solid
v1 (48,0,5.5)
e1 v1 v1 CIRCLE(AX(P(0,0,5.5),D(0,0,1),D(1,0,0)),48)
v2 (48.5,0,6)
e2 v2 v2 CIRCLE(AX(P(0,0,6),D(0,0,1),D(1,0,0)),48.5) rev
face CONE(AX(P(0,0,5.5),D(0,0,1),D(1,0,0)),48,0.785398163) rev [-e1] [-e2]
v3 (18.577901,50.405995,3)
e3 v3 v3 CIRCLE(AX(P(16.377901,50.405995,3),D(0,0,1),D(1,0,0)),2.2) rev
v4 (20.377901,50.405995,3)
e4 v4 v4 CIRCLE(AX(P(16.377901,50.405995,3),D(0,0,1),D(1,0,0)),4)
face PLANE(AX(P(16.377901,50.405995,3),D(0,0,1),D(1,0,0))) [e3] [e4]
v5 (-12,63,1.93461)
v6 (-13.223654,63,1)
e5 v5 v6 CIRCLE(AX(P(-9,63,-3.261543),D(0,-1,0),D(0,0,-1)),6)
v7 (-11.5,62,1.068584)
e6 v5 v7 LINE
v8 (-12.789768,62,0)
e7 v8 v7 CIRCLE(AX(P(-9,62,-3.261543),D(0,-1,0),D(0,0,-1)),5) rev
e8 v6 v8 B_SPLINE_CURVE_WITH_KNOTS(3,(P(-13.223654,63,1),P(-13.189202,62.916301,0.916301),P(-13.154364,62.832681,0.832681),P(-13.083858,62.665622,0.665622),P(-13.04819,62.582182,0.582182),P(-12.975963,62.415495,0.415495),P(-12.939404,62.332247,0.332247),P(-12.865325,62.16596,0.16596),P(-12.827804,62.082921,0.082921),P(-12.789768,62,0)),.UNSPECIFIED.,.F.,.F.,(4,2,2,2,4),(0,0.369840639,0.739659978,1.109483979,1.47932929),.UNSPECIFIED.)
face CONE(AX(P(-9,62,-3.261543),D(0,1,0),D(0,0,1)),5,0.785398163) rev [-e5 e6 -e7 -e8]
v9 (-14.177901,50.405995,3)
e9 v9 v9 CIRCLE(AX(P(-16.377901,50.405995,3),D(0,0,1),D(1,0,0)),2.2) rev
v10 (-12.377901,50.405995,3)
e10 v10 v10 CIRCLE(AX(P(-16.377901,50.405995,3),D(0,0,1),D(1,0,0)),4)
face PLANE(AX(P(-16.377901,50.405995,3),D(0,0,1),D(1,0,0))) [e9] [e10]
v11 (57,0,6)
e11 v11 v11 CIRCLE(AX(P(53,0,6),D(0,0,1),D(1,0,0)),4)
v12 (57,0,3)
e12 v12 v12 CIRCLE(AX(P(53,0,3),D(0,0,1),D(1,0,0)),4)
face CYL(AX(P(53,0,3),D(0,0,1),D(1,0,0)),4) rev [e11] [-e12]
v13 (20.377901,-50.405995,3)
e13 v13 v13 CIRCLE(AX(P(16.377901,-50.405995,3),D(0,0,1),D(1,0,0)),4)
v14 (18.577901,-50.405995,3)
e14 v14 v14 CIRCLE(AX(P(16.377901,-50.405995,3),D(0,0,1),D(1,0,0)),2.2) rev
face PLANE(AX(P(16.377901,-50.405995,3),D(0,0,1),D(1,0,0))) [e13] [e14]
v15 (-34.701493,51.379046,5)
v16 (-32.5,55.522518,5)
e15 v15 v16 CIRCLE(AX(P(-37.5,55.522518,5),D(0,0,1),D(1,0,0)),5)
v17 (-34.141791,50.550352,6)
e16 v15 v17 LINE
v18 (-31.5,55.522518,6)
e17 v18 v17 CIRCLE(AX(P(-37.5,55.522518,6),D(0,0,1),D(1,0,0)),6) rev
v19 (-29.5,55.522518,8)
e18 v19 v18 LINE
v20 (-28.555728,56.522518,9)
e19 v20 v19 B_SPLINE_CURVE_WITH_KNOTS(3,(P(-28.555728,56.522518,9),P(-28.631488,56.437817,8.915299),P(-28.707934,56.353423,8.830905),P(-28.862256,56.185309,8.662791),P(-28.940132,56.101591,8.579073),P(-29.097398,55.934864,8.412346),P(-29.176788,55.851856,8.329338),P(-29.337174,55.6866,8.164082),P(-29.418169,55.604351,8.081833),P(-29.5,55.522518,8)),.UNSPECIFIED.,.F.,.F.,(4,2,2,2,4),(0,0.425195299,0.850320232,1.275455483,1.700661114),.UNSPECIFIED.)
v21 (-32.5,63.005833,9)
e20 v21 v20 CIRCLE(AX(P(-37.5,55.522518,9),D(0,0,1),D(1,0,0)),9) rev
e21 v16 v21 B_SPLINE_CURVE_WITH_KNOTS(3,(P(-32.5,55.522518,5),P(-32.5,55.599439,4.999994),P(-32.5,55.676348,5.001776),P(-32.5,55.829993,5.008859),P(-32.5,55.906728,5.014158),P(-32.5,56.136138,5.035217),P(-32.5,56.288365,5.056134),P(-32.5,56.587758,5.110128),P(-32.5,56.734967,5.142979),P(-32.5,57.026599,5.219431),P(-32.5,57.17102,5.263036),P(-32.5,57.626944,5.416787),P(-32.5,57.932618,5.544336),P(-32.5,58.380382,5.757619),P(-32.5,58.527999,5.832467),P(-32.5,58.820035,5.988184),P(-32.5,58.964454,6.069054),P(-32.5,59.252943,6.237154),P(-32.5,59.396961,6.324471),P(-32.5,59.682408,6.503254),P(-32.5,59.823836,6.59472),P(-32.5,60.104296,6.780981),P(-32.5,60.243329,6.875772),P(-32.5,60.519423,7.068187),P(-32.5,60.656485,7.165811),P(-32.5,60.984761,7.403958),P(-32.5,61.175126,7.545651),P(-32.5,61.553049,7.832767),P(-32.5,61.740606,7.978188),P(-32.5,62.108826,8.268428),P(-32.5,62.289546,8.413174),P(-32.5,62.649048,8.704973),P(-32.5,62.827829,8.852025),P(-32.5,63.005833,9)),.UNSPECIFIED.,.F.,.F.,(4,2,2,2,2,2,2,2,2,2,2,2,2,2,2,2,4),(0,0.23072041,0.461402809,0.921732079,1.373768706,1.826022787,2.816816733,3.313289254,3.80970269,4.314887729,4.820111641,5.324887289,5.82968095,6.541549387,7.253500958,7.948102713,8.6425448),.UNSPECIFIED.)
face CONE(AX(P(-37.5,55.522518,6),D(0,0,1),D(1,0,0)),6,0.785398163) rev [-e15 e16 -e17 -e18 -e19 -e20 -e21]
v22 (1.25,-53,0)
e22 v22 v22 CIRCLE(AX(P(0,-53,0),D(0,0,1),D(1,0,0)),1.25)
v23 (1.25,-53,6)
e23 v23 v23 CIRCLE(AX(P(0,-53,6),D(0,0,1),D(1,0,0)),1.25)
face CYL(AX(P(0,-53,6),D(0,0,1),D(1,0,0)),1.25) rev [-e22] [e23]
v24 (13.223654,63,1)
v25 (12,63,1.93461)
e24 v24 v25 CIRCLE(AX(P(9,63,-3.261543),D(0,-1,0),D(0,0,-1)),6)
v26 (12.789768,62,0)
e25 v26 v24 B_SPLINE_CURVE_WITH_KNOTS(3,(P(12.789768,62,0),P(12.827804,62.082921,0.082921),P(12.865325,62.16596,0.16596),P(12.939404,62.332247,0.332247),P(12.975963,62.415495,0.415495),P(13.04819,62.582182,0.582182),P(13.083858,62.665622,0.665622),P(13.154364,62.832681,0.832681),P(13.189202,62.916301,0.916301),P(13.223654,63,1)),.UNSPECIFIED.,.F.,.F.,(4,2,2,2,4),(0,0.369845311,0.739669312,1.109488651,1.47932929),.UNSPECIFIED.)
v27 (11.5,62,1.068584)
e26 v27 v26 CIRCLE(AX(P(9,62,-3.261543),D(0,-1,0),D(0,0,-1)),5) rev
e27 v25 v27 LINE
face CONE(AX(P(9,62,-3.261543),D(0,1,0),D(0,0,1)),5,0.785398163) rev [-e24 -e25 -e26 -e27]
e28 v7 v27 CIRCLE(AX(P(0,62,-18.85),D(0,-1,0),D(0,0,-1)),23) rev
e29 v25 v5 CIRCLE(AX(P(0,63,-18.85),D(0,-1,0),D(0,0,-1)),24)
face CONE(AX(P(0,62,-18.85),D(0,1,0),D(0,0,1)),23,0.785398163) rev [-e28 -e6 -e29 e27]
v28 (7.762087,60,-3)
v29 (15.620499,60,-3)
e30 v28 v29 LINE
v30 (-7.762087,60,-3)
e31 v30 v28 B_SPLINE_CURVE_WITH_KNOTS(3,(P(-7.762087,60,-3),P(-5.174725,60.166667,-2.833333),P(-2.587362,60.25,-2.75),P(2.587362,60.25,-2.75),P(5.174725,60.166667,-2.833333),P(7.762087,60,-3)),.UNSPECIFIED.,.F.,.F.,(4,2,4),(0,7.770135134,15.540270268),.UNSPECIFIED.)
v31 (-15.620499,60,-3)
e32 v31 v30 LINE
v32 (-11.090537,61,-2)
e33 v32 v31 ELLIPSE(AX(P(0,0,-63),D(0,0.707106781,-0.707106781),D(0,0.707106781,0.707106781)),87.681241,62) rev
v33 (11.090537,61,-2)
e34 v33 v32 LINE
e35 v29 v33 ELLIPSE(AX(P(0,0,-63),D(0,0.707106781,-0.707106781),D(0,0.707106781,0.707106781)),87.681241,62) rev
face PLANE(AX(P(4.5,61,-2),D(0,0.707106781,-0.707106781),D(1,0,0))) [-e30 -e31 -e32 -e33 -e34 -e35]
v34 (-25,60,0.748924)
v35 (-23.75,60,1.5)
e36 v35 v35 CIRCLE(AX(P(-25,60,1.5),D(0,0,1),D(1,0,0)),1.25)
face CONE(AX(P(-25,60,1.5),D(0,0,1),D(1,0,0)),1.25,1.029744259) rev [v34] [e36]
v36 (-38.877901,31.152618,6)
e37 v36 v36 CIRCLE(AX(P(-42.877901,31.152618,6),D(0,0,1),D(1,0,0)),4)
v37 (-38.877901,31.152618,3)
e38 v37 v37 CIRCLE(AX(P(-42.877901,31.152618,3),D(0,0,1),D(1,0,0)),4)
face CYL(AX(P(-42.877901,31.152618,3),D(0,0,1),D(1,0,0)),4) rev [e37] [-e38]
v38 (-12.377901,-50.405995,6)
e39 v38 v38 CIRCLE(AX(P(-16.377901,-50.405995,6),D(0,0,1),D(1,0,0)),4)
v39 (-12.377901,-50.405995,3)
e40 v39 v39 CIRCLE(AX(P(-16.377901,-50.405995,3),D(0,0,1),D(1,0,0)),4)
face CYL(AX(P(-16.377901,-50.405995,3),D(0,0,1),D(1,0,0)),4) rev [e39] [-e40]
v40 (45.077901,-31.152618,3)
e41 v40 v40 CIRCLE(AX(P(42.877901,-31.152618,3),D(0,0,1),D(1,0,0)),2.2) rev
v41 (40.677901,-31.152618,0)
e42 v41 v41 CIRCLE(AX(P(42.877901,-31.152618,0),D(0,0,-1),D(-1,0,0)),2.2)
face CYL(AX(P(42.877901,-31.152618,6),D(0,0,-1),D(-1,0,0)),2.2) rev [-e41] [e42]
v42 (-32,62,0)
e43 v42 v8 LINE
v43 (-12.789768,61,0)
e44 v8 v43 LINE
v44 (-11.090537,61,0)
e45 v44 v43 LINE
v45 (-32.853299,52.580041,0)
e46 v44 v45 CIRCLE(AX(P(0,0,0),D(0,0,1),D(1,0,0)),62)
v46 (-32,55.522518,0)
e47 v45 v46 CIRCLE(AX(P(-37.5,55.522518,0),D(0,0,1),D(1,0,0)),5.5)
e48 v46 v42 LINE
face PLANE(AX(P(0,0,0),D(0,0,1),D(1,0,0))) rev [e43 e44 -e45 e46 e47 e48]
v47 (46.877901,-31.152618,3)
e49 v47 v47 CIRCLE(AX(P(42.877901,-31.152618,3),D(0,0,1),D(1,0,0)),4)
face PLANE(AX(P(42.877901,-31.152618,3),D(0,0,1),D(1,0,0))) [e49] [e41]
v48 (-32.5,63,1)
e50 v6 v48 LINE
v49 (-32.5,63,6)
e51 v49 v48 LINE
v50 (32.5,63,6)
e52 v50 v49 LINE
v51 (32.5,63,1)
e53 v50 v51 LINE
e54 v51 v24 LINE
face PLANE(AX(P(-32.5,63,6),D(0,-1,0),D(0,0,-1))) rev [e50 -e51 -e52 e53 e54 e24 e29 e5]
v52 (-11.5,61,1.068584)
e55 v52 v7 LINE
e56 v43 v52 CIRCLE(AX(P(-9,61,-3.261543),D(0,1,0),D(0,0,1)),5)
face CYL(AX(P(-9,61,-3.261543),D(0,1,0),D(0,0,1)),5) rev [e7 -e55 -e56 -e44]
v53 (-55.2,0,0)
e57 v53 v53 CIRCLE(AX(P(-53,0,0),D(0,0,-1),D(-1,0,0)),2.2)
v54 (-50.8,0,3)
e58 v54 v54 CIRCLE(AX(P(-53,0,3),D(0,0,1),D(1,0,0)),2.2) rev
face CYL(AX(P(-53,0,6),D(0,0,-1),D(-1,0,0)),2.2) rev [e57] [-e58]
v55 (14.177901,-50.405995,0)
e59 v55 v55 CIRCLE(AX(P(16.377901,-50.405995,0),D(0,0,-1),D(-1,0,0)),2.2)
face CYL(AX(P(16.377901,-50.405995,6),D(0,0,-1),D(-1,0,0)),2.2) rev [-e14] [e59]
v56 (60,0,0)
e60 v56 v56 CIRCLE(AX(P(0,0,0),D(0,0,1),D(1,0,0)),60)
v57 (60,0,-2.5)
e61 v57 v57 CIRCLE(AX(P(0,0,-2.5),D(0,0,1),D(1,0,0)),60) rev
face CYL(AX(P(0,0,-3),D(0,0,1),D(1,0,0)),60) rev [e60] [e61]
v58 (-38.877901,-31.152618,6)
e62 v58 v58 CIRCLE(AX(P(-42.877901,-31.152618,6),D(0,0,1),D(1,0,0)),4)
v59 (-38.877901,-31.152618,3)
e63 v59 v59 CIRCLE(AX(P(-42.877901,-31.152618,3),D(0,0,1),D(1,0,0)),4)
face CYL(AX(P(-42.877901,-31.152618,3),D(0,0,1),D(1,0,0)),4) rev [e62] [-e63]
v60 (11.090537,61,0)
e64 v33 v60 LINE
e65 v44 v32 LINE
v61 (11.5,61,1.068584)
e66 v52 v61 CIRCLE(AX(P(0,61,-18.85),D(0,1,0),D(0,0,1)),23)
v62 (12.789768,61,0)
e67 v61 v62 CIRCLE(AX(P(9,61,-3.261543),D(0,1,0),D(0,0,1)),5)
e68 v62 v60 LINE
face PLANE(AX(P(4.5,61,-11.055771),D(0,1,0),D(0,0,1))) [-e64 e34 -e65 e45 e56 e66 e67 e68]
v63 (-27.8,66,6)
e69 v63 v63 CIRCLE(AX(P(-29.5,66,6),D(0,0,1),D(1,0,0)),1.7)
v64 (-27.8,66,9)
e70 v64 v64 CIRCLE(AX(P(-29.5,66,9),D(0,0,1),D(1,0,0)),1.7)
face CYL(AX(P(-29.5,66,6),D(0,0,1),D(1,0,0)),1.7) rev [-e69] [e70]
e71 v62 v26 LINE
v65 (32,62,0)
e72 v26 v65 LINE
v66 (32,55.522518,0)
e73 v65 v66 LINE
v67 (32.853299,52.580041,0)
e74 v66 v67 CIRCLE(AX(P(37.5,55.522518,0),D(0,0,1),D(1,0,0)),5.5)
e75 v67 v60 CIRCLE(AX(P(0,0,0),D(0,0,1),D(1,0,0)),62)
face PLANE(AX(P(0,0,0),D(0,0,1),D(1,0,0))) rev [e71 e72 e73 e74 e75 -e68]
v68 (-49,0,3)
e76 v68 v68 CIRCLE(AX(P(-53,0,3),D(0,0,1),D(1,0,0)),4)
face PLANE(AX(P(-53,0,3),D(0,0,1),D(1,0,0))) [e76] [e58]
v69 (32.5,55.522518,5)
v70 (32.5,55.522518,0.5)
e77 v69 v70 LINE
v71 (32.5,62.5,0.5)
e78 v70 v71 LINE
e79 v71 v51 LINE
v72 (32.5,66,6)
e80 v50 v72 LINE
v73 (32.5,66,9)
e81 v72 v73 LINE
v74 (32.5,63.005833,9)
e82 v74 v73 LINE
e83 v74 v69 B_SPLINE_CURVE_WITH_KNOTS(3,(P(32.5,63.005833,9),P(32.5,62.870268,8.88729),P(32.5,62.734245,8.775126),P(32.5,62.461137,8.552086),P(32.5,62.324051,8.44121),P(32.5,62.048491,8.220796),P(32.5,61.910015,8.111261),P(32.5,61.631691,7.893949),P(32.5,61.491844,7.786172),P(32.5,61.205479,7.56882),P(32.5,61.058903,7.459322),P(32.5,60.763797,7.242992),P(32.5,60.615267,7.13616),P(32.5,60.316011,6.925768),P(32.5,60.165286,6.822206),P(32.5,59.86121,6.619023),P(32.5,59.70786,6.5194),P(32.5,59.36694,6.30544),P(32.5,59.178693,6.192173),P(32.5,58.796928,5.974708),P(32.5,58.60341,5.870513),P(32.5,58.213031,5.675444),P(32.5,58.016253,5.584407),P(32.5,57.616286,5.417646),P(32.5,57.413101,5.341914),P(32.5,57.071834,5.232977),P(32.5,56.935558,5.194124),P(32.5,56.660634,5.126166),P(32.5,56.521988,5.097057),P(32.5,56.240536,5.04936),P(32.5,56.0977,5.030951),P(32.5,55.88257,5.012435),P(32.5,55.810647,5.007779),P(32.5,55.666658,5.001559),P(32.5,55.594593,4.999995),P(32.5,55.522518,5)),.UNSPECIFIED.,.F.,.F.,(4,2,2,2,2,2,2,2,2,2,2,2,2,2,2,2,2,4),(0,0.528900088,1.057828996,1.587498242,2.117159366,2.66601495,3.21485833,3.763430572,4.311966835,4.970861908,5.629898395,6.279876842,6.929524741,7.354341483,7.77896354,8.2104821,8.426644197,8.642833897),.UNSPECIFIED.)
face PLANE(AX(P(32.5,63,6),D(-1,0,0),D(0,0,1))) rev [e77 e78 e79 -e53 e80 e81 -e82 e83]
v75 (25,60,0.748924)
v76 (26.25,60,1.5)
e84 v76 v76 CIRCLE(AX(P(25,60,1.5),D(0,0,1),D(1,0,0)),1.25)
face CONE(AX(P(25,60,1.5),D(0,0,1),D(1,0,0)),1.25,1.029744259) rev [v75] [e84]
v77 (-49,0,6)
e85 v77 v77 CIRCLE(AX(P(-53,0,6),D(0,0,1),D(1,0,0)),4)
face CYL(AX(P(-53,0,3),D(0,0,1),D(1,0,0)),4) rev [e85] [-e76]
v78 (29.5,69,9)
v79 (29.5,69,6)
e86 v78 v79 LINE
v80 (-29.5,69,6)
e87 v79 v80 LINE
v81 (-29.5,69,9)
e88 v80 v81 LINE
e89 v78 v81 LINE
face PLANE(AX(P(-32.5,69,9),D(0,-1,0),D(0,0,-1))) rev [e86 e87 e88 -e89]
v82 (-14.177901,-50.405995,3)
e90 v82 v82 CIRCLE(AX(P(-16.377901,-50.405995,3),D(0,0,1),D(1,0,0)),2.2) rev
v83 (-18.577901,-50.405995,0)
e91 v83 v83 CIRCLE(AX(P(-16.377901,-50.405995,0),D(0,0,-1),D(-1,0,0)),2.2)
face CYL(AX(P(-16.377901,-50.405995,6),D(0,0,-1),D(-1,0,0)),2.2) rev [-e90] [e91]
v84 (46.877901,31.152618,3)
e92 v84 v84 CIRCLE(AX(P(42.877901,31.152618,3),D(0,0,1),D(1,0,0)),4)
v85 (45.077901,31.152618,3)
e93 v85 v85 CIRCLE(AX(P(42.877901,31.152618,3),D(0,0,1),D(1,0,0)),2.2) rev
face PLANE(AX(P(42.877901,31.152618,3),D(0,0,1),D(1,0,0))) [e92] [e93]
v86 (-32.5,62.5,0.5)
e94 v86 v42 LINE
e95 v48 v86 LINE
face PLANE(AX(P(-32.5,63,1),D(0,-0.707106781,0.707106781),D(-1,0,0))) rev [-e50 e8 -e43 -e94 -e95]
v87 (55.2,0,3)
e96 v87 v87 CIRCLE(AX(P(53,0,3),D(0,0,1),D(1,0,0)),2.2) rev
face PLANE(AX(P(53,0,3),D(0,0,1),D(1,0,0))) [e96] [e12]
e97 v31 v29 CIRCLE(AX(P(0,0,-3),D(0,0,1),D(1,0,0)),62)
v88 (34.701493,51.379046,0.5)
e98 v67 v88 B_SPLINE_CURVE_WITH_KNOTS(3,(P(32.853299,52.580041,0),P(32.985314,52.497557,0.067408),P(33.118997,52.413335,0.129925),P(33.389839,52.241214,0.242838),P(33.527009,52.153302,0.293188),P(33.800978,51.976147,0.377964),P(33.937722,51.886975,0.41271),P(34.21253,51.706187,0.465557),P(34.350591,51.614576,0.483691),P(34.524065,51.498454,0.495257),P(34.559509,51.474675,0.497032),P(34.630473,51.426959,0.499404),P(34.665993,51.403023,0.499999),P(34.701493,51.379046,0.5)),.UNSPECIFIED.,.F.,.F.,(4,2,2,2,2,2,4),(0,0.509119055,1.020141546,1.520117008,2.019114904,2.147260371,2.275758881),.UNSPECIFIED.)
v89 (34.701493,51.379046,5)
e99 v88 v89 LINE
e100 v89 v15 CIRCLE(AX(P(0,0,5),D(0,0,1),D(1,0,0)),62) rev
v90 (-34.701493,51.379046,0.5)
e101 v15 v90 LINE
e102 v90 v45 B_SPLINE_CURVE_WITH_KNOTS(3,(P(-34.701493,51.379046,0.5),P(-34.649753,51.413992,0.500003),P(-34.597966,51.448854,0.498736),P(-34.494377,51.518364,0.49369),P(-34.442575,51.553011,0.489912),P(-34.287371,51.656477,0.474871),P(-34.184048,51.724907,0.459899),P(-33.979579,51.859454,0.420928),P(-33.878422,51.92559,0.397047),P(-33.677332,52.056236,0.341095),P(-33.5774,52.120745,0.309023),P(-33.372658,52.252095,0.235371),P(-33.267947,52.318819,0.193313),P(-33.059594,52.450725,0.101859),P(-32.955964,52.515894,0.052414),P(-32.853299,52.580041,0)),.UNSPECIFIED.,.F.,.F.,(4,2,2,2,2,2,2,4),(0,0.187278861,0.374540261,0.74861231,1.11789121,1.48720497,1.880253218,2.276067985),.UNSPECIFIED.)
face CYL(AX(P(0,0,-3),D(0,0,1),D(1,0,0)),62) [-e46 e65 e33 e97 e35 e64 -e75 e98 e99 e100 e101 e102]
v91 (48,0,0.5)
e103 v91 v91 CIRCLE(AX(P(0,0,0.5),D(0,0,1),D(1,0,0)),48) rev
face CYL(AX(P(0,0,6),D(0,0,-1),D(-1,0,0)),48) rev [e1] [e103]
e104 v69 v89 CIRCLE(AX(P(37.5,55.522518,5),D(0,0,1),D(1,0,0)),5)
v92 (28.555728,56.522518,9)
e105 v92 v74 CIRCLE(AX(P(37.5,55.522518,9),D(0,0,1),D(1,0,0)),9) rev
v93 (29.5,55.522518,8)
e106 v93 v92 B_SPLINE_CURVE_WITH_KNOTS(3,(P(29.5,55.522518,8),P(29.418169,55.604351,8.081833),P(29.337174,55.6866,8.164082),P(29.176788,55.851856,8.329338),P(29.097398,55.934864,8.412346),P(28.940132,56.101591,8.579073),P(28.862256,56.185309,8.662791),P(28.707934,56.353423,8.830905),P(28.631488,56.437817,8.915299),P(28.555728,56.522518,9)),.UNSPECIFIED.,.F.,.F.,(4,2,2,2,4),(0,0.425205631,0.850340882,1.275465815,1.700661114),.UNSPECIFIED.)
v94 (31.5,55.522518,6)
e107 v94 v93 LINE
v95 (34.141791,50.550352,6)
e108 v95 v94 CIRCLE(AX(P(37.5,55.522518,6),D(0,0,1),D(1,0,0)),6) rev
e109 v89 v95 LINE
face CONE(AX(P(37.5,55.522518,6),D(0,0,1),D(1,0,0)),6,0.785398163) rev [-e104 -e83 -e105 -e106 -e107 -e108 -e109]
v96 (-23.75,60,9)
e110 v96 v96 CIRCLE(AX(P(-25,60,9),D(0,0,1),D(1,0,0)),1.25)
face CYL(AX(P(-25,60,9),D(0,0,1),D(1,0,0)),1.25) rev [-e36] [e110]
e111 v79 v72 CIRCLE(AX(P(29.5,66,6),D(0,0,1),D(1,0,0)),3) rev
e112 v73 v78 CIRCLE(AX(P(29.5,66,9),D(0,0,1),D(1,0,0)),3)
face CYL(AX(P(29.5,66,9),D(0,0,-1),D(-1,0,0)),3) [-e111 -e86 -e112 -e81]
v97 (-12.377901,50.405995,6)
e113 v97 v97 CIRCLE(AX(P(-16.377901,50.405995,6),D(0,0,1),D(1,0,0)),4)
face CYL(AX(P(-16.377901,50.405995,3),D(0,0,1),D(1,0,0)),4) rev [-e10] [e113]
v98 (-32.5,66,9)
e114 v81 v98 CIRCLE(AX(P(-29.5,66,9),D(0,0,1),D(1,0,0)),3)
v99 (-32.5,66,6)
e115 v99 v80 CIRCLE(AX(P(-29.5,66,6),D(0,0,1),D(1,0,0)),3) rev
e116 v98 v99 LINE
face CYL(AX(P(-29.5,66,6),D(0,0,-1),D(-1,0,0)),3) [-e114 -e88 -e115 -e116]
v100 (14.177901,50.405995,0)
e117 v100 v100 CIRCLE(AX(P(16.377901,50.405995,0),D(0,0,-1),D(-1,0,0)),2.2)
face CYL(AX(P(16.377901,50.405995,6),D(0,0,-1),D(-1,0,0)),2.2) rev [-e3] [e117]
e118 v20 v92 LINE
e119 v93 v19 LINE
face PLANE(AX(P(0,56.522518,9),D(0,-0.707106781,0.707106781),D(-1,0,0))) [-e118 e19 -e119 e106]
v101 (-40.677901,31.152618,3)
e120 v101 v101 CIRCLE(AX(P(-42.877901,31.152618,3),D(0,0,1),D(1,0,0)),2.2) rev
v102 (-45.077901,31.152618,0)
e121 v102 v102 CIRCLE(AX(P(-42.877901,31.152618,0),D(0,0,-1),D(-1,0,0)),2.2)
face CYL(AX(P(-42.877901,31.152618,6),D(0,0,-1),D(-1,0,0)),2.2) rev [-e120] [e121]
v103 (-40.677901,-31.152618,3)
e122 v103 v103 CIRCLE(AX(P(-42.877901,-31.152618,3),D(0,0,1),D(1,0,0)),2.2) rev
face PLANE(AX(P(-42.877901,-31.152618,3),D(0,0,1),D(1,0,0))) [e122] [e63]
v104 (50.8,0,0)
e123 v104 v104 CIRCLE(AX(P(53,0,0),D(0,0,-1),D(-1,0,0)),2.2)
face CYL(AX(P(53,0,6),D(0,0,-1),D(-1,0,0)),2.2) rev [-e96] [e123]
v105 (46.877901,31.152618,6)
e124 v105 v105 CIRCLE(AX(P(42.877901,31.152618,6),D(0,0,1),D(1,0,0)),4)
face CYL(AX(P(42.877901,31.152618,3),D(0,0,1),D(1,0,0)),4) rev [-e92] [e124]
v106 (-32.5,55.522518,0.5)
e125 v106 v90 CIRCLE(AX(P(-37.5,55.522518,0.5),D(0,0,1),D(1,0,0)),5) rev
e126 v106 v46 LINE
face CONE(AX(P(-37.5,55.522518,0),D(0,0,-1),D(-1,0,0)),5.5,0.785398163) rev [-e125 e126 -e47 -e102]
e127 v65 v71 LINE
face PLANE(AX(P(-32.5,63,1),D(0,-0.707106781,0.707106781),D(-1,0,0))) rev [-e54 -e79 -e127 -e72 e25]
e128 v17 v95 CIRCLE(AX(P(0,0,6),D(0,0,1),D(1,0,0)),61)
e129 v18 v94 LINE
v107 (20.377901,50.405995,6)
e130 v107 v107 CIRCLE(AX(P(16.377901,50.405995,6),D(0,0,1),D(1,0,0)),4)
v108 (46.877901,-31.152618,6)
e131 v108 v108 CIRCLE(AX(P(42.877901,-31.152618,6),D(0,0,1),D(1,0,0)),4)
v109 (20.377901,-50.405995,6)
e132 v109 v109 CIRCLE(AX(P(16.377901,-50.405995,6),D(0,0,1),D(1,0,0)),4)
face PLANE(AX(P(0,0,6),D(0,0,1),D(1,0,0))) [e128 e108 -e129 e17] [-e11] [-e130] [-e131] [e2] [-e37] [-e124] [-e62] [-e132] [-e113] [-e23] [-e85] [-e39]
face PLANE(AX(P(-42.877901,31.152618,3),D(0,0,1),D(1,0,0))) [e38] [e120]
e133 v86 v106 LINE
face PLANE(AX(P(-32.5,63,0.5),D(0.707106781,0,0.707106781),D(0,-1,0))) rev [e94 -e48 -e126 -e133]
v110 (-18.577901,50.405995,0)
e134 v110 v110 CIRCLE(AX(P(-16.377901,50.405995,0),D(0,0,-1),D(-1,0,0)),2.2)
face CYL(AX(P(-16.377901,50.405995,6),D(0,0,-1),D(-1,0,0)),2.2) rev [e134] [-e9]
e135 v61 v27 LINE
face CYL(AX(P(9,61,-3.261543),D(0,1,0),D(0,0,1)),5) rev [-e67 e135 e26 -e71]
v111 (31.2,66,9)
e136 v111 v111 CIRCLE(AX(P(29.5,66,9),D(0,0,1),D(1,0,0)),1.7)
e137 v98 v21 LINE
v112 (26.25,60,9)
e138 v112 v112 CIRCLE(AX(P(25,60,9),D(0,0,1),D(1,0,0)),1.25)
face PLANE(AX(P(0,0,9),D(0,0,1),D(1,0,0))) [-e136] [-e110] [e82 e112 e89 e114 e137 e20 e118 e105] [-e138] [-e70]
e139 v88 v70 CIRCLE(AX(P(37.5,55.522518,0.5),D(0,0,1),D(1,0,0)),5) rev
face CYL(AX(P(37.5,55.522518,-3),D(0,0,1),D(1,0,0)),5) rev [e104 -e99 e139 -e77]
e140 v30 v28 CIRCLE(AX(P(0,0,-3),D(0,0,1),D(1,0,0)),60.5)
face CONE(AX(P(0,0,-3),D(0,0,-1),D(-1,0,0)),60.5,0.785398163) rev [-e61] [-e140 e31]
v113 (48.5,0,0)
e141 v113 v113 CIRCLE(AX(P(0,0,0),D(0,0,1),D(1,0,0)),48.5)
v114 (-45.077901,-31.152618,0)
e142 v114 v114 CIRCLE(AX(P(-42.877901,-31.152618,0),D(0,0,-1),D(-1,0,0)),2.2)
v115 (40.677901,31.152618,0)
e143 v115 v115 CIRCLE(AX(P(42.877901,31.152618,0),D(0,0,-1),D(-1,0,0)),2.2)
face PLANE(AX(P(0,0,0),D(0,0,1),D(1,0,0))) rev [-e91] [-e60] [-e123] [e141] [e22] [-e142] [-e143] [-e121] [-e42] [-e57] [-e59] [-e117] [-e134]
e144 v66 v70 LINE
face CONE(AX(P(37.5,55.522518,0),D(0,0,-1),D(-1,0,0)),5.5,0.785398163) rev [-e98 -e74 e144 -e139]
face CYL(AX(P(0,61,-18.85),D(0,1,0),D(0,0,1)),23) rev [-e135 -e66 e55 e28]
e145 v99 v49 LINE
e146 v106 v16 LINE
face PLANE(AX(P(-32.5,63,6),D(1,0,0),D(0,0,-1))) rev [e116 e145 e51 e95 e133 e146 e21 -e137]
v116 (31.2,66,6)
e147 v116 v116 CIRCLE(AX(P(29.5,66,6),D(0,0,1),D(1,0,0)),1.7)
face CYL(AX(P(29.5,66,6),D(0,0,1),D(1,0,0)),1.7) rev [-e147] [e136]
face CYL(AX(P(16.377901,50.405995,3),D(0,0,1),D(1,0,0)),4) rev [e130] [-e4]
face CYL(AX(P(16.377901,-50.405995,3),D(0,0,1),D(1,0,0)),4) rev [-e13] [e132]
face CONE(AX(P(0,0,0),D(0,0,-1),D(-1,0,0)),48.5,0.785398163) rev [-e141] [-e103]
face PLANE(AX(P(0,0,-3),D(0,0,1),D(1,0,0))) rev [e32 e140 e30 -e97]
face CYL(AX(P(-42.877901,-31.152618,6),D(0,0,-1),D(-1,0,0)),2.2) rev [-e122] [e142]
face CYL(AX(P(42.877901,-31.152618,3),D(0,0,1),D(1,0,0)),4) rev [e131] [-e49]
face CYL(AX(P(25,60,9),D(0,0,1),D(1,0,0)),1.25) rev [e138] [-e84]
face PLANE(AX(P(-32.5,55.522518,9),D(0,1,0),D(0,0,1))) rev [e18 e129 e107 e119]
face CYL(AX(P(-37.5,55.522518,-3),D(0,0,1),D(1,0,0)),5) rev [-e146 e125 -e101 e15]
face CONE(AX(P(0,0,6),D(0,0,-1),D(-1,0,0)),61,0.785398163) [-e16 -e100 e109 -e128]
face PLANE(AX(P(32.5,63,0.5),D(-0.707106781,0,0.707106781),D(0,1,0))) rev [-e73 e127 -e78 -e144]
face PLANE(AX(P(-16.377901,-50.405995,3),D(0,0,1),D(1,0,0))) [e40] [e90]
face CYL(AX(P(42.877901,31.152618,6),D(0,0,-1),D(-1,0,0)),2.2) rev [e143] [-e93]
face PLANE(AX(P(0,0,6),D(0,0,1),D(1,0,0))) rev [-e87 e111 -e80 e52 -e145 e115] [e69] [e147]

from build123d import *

# Parameters (mm, degrees)
SKETCH_1_R             = 62
SKETCH_1_R_2           = 60
EXTRUDE_1_DEPTH        = 3
EXTRUDE_START          = 6
SKETCH_2_R             = 48
EXTRUDE_2_DEPTH        = 6
FILLET_1_R             = 5
CHAMFER_1_SIZE         = 0.5
CHAMFER_2_SIZE         = 0.5
SKETCH_6_R             = 2.2
CUT_EXTRUDE_1_DEPTH    = 6
SKETCH_7_W             = 65
SKETCH_7_H             = 13.477482046
EXTRUDE_3_DEPTH        = 3
SKETCH_11_R            = 1.7
CUT_EXTRUDE_2_DEPTH    = 3
CHAMFER_3_SIZE         = 1
CHAMFER_4_SIZE         = 1
FILLET_2_R             = 3
CHAMFER_5_3_ANGLE      = 291.929687
SKETCH_12_R            = 4
CUT_EXTRUDE_3_DEPTH    = 3
CUT_EXTRUDE_4_DEPTH    = 2
CHAMFER_6_SIZE         = 1
HOLE_WIZARD_M3_1_D     = 2.5
HOLE_WIZARD_M3_1_DEPTH = 7.5
HOLE_WIZARD_M3_1_TIP   = 0.751075774
HOLE_WIZARD_M3_2_D     = 2.5
HOLE_WIZARD_M3_2_DEPTH = 7.5
HOLE_WIZARD_M3_2_TIP   = 0.751075774


with BuildPart() as part:
    # 草图1 → 凸台-拉伸1 (new body)
    with BuildSketch(Plane.XY):
        Circle(SKETCH_1_R)
        Circle(SKETCH_1_R_2, mode=Mode.SUBTRACT)
    extrude(amount=-EXTRUDE_1_DEPTH)

    # 草图2 → 凸台-拉伸2 (add)
    with BuildSketch(Plane.XY.offset(EXTRUDE_START)):
        with BuildLine():
            Line((-32.5, 63), (32.5, 63))
            Line((32.5, 63), (32.5, 52.79914772))
            ThreePointArc((32.5, 52.79914772), (0, -62), (-32.5, 52.79914772))
            Line((-32.5, 52.79914772), (-32.5, 63))
        make_face()
        Circle(SKETCH_2_R, mode=Mode.SUBTRACT)
    extrude(amount=-EXTRUDE_2_DEPTH)

    # 圆角1
    # the kernel refuses this fillet: 5 mm, written as the material it adds along each edge
    with BuildSketch(Plane(origin=(32.5, 52.79914772, 6), x_dir=(0.8403342947446245, -0.5420685132675156, 0), z_dir=(0, 0, -1))) as fillet_1_piece_1:
        with BuildLine():
            CenterArc((2.72541822, -4.998883971), FILLET_1_R, 91.210593649, 55.964843523)
            Line((-1.476253254, -2.288541405), (0, 0))
            ThreePointArc((0, 0), (1.309890927, -0.013838756), (2.619781855, 0))
        make_face()
    extrude(amount=6)
    with BuildSketch(Plane(origin=(-32.5, 52.79914772, 6), x_dir=(-0.840334294744627, -0.5420685132675117, 0), z_dir=(0, 0, -1))) as fillet_1_piece_2:
        with BuildLine():
            CenterArc((2.72541822, 4.998883971), FILLET_1_R, 212.824562828, 55.964843523)
            Line((-1.476253254, 2.288541405), (0, 0))
            ThreePointArc((0, 0), (1.309890927, 0.013838756), (2.619781855, 0))
        make_face()
    extrude(amount=6)

    # 倒角1
    chamfer_1_edges = [part.edges().sort_by_distance(p)[0] for p in [
        (-48, 0, 0),
        (-48, 0, 6),
        (-60, 0, -3),
    ]]
    chamfer(chamfer_1_edges, length=CHAMFER_1_SIZE)

    # 倒角2
    # the kernel refuses this chamfer: 0.5 mm, written as the material it takes off along each edge
    with BuildSketch(Plane(origin=(-32.5, 55.522517954, 0), x_dir=(0, 0, 1), z_dir=(0, 1, 0)), Plane(origin=(32.5, 64.285841494, 0), x_dir=(0, 0, 1), z_dir=(0, -1, 0))) as chamfer_2_piece_1:
        Polygon((CHAMFER_2_SIZE, 0), (0, CHAMFER_2_SIZE), (0, 0), align=None)
    extrude(amount=8.76332354, mode=Mode.SUBTRACT)
    with BuildSketch(Plane(origin=(37.5, 55.522517954, 0), x_dir=(-0.15613015555825177, -0.9877364904291813, 0), z_dir=(0.9877364904291813, -0.15613015555825177, 0))) as chamfer_2_piece_2_section:
        Polygon((5, -CHAMFER_2_SIZE), (5 + CHAMFER_2_SIZE, 0), (5, 0), align=None)
    chamfer_2_piece_2 = revolve(axis=Axis((37.5, 55.522517954, 0), (0, 0, -1)), revolution_arc=81.017652556, mode=Mode.PRIVATE)
    chamfer_2_piece_2 = chamfer_2_piece_2 - Plane(origin=(0, 0, 0), x_dir=(1, 0, 0), z_dir=(0, 0, 1)) * Cylinder(62, 22, mode=Mode.PRIVATE)
    add(chamfer_2_piece_2, mode=Mode.SUBTRACT)
    with BuildSketch(Plane(origin=(-37.5, 55.522517954, 0), x_dir=(1, 0, 0), z_dir=(0, 1, 0))) as chamfer_2_piece_3_section:
        Polygon((5, -CHAMFER_2_SIZE), (5 + CHAMFER_2_SIZE, 0), (5, 0), align=None)
    chamfer_2_piece_3 = revolve(axis=Axis((-37.5, 55.522517954, 0), (0, 0, -1)), revolution_arc=81.017652556, mode=Mode.PRIVATE)
    chamfer_2_piece_3 = chamfer_2_piece_3 - Plane(origin=(0, 0, 0), x_dir=(1, 0, 0), z_dir=(0, 0, 1)) * Cylinder(62, 22, mode=Mode.PRIVATE)
    add(chamfer_2_piece_3, mode=Mode.SUBTRACT)

    # 草图6 → 切除-拉伸1 (cut)
    with BuildSketch(Plane(origin=(0, 0, 0), x_dir=(-1, 0, 0), z_dir=(0, 0, -1))):
        with Locations((-42.877900702, 31.152618372)):
            Circle(SKETCH_6_R)
        with Locations((-53, 0)):
            Circle(SKETCH_6_R)
        with Locations((-42.877900702, -31.152618371)):
            Circle(SKETCH_6_R)
        with Locations((-16.377900702, -50.405995364)):
            Circle(SKETCH_6_R)
        with Locations((16.377900702, -50.405995364)):
            Circle(SKETCH_6_R)
        with Locations((42.877900702, -31.152618371)):
            Circle(SKETCH_6_R)
        with Locations((53, 0)):
            Circle(SKETCH_6_R)
        with Locations((42.877900702, 31.152618372)):
            Circle(SKETCH_6_R)
        with Locations((16.377900702, 50.405995364)):
            Circle(SKETCH_6_R)
        with Locations((-16.377900702, 50.405995364)):
            Circle(SKETCH_6_R)
    extrude(amount=-CUT_EXTRUDE_1_DEPTH, mode=Mode.SUBTRACT)

    # 草图7 → 凸台-拉伸3 (add)
    with BuildSketch(Plane.XY.offset(6)):
        with Locations((0, 62.261258977)):
            Rectangle(SKETCH_7_W, SKETCH_7_H)
    extrude(amount=EXTRUDE_3_DEPTH)

    # 草图11 → 切除-拉伸2 (cut)
    with BuildSketch(Plane.XY.offset(9)):
        with Locations((-29.5, 66)):
            Circle(SKETCH_11_R)
        with Locations((29.5, 66)):
            Circle(SKETCH_11_R)
    extrude(amount=-CUT_EXTRUDE_2_DEPTH, mode=Mode.SUBTRACT)

    # 倒角3
    chamfer_3_edges = [part.edges().sort_by_distance(p)[0] for p in [
        (0, 63, 0),
    ]]
    chamfer(chamfer_3_edges, length=CHAMFER_3_SIZE - 0.0001)  # a hair under: the kernel refuses the full size

    # 倒角4
    chamfer_4_edges = [part.edges().sort_by_distance(p)[0] for p in [
        (0, 55.522517954, 9),
    ]]
    chamfer(chamfer_4_edges, length=CHAMFER_4_SIZE)

    # 圆角2
    fillet_2_edges = [part.edges().sort_by_distance(p)[0] for p in [
        (-32.5, 69, 7.5),
        (32.5, 69, 7.5),
    ]]
    fillet(fillet_2_edges, radius=FILLET_2_R)

    # 倒角5: read off the stored shape, not the designer's step
    # 倒角5 outline → 倒角5 (revolve, cut)
    with BuildSketch(Plane(origin=(37.5, 55.522517954, 0), x_dir=(1, 0, 0), z_dir=(0, -1, 0))):
        Polygon((4.999998721, 9), (4.999998721, 4.999998721), (9, 9), align=None)
    revolve(axis=Axis((37.5, 55.522517954, 0), (0, 0, 1)), mode=Mode.SUBTRACT)

    # Chamfer 5 2 outline → Chamfer 5 2 (revolve, cut)
    with BuildSketch(Plane(origin=(-37.5, 55.522517954, 0), x_dir=(1, 0, 0), z_dir=(0, -1, 0))):
        Polygon((4.99999762, 9), (4.99999762, 4.99999762), (9, 9), align=None)
    revolve(axis=Axis((-37.5, 55.522517954, 0), (0, 0, 1)), mode=Mode.SUBTRACT)

    # Chamfer 5 3 outline → Chamfer 5 3 (revolve, cut)
    with BuildSketch(Plane(origin=(0, 0, 0), x_dir=(-0.5597014925373135, 0.8286942978273132, 0), z_dir=(0.8286942978273132, 0.5597014925373135, 0))):
        Polygon((62, 6), (61, 6), (62, 5), align=None)
    revolve(axis=Axis((0, 0, 0), (0, 0, 1)), revolution_arc=CHAMFER_5_3_ANGLE, mode=Mode.SUBTRACT)

    # 草图12 → 切除-拉伸3 (cut)
    with BuildSketch(Plane.XY.offset(6)):
        with Locations((-16.377900702, 50.405995364)):
            Circle(SKETCH_12_R)
        with Locations((16.377900702, 50.405995364)):
            Circle(SKETCH_12_R)
        with Locations((42.877900702, 31.152618372)):
            Circle(SKETCH_12_R)
        with Locations((53, 0)):
            Circle(SKETCH_12_R)
        with Locations((42.877900702, -31.152618371)):
            Circle(SKETCH_12_R)
        with Locations((16.377900702, -50.405995364)):
            Circle(SKETCH_12_R)
        with Locations((-16.377900702, -50.405995364)):
            Circle(SKETCH_12_R)
        with Locations((-42.877900702, -31.152618371)):
            Circle(SKETCH_12_R)
        with Locations((-53, 0)):
            Circle(SKETCH_12_R)
        with Locations((-42.877900702, 31.152618372)):
            Circle(SKETCH_12_R)
    extrude(amount=-CUT_EXTRUDE_3_DEPTH, mode=Mode.SUBTRACT)

    # 草图14 → 切除-拉伸4 (cut)
    with BuildSketch(Plane(origin=(0, 63, 0), x_dir=(1, 0, 0), z_dir=(0, 1, 0))):
        with BuildLine():
            ThreePointArc((-4.030108666, 3.809429698), (-11.733833556, 7.447967709), (-11.5, -1.068584287))
            ThreePointArc((-11.5, -1.068584287), (0, -4.15), (11.5, -1.068584287))
            ThreePointArc((11.5, -1.068584287), (11.733833556, 7.447967709), (4.030108666, 3.809429698))
            ThreePointArc((4.030108666, 3.809429698), (0, 5.85), (-4.030108666, 3.809429698))
        make_face()
    extrude(amount=-CUT_EXTRUDE_4_DEPTH, mode=Mode.SUBTRACT)

    # 倒角6
    # the kernel refuses this chamfer: 1 mm, written as the material it takes off along each edge
    with BuildSketch(Plane(origin=(18.80558547, 61, -3), x_dir=(0, -1, 0), z_dir=(-1, 0, 0))) as chamfer_6_piece_1:
        Polygon((CHAMFER_6_SIZE, 0), (0, CHAMFER_6_SIZE), (0, 0), align=None)
    extrude(amount=37.61117094, mode=Mode.SUBTRACT)
    with BuildSketch(Plane(origin=(-9, 63, -3.261542732), x_dir=(-0.874686173337968, 0, 0.48468969266055384), z_dir=(-0.48468969266055384, 0, -0.874686173337968))) as chamfer_6_piece_2:
        Polygon((5, -CHAMFER_6_SIZE), (5 + CHAMFER_6_SIZE, 0), (5, 0), align=None)
    revolve(axis=Axis((-9, 63, -3.261542732), (0, 1, 0)), revolution_arc=31.007856081, mode=Mode.SUBTRACT)
    with BuildSketch(Plane(origin=(9, 63, -3.261542732), x_dir=(0.49999999999998873, 0, 0.8660254037844451), z_dir=(-0.8660254037844451, 0, 0.49999999999998873))) as chamfer_6_piece_3:
        Polygon((5, -CHAMFER_6_SIZE), (5 + CHAMFER_6_SIZE, 0), (5, 0), align=None)
    revolve(axis=Axis((9, 63, -3.261542732), (0, 1, 0)), revolution_arc=31.007856081, mode=Mode.SUBTRACT)
    with BuildSketch(Plane(origin=(0, 63, -18.85), x_dir=(-0.500000000000001, 0, 0.8660254037844382), z_dir=(-0.8660254037844382, 0, -0.500000000000001))) as chamfer_6_piece_4:
        Polygon((23, -CHAMFER_6_SIZE), (23 + CHAMFER_6_SIZE, 0), (23, 0), align=None)
    revolve(axis=Axis((0, 63, -18.85), (0, 1, 0)), revolution_arc=60, mode=Mode.SUBTRACT)

    # M3 螺纹孔1
    with Locations(Plane.XY.offset(9)):
        with Locations((-25, 60), (25, 60)):
            Hole(HOLE_WIZARD_M3_1_D / 2, depth=HOLE_WIZARD_M3_1_DEPTH)
            with Locations((0, 0, -(HOLE_WIZARD_M3_1_DEPTH + HOLE_WIZARD_M3_1_TIP / 2))):  # 118° drill point
                Cone(0, HOLE_WIZARD_M3_1_D / 2, HOLE_WIZARD_M3_1_TIP, mode=Mode.SUBTRACT)

    # M3 螺纹孔2
    with Locations(Plane.XY.offset(6)):
        with Locations((0, -53)):
            Hole(HOLE_WIZARD_M3_2_D / 2, depth=HOLE_WIZARD_M3_2_DEPTH)
            with Locations((0, 0, -(HOLE_WIZARD_M3_2_DEPTH + HOLE_WIZARD_M3_2_TIP / 2))):  # 118° drill point
                Cone(0, HOLE_WIZARD_M3_2_D / 2, HOLE_WIZARD_M3_2_TIP, mode=Mode.SUBTRACT)


solid = part.part
